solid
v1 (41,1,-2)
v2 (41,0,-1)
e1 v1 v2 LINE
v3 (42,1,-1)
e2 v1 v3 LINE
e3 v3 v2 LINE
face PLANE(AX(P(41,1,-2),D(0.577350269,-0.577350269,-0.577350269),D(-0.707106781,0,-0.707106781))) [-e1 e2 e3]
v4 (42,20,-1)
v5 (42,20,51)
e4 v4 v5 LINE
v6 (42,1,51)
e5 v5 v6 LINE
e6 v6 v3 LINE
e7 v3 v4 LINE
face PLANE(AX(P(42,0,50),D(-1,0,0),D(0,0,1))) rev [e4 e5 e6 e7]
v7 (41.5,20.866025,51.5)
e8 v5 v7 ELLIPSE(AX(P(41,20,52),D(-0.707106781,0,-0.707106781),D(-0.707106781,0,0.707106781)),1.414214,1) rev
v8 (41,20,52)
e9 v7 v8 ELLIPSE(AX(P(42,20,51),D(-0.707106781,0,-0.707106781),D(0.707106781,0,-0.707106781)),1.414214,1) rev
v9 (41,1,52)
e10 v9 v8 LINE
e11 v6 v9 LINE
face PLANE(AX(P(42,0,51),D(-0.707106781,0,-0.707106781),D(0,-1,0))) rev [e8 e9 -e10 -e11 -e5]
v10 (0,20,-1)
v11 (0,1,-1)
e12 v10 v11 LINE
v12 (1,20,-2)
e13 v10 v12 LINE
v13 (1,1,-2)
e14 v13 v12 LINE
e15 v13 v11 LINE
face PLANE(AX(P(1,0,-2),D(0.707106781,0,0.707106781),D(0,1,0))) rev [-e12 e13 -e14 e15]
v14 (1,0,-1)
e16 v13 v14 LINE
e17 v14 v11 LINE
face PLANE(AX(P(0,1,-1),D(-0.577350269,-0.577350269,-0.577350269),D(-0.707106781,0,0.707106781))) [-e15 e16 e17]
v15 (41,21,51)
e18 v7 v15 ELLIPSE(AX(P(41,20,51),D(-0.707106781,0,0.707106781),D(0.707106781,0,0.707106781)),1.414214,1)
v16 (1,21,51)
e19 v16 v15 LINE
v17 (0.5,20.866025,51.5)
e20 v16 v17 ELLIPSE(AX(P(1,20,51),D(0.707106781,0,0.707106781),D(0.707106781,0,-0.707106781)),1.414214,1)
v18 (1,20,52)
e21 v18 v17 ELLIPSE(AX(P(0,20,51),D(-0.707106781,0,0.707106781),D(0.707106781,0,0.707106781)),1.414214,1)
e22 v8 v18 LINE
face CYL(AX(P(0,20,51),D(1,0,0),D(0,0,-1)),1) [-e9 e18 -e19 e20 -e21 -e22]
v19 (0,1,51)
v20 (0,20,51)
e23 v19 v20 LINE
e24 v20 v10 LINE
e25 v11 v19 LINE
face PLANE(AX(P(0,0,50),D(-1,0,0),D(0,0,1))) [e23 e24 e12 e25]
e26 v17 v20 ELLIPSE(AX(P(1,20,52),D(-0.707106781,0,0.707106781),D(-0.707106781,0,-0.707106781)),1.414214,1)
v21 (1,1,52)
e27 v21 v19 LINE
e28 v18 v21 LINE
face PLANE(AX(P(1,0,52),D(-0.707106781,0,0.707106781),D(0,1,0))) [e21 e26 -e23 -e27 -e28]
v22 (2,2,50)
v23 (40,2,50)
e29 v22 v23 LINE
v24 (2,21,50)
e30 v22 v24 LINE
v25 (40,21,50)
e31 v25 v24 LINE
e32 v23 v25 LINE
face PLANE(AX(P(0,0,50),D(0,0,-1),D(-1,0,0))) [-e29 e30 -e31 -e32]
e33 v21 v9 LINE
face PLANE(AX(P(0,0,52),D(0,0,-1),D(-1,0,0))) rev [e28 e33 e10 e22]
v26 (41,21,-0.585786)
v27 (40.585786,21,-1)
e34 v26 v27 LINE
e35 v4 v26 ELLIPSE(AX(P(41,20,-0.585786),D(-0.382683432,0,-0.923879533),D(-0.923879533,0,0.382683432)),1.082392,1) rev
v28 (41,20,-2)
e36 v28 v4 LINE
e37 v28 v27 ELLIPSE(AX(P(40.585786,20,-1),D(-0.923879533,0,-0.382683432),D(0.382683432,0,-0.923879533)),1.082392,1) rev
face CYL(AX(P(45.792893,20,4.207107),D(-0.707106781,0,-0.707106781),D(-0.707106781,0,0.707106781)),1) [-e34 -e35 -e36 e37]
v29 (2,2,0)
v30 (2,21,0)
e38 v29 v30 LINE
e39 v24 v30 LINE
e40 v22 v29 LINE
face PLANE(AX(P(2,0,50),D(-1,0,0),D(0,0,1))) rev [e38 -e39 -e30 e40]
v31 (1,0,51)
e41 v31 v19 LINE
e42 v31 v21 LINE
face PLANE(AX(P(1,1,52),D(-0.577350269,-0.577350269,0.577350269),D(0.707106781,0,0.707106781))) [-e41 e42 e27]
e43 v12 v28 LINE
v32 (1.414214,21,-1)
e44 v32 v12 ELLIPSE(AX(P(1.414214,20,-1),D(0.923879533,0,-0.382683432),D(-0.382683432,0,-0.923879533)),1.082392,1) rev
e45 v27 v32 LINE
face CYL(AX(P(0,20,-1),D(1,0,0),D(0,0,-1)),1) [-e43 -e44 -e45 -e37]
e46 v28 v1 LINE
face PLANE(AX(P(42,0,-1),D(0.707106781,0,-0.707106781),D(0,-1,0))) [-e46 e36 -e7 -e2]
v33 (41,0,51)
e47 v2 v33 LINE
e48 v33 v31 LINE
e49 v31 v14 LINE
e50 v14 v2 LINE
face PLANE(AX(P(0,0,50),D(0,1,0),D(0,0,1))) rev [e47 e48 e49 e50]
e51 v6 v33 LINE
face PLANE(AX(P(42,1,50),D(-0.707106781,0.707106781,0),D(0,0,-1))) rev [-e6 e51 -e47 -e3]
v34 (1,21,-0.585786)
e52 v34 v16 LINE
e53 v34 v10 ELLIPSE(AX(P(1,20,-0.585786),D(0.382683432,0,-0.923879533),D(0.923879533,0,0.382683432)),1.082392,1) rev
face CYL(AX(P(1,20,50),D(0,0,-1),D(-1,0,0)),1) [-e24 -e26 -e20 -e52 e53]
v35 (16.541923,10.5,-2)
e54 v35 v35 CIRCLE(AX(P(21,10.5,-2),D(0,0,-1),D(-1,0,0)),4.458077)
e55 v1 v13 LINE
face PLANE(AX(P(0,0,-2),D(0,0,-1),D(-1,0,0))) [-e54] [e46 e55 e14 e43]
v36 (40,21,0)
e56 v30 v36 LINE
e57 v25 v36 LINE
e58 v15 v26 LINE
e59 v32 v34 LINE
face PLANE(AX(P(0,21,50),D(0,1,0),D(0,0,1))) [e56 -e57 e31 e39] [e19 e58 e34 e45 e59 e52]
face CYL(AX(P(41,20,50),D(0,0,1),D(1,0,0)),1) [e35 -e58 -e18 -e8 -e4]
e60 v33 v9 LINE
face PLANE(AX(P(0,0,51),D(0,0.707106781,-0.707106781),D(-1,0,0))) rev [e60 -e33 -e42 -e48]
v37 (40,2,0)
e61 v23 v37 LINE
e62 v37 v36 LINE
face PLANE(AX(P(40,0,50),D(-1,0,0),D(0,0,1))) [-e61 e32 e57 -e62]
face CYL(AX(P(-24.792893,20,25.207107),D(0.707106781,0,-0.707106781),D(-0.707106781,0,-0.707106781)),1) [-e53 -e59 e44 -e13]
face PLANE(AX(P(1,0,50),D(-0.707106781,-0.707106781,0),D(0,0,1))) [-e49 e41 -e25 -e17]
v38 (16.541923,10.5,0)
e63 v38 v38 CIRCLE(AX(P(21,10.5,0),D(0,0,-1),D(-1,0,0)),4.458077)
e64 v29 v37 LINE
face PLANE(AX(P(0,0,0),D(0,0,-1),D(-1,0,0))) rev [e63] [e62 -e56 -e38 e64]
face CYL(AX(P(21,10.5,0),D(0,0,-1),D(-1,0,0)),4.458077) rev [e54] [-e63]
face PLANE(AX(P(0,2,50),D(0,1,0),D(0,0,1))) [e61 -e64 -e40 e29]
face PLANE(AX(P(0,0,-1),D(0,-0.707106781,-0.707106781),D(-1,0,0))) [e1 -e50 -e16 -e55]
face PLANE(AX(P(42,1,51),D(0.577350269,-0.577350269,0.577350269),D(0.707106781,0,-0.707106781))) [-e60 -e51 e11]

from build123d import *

# Parameters (mm, degrees)
BOSS_EXTRUDE1_DEPTH = 50
SKETCH1_3_W         = 42
SKETCH1_3_H         = 21
BOSS_EXTRUDE2_DEPTH = 2
BOSS_EXTRUDE3_START = 50
SKETCH1_4_W         = 42
SKETCH1_4_H         = 21
BOSS_EXTRUDE3_DEPTH = 2
SKETCH2_R           = 4.458076667
CUT_EXTRUDE1_DEPTH  = 2
CHAMFER1_SIZE       = 1
FILLET1_R           = 1


with BuildPart() as part:
    # Sketch1 → Boss-Extrude1 (new body)
    with BuildSketch(Plane.XY):
        Polygon((40, 21), (40, 2), (2, 2), (2, 21), (0, 21), (0, 0), (42, 0), (42, 21), align=None)
    extrude(amount=BOSS_EXTRUDE1_DEPTH)

    # Sketch1<3> → Boss-Extrude2 (add)
    with BuildSketch(Plane.XY):
        with Locations((21, 10.5)):
            Rectangle(SKETCH1_3_W, SKETCH1_3_H)
    extrude(amount=-BOSS_EXTRUDE2_DEPTH)

    # Sketch1<4> → Boss-Extrude3 (add)
    with BuildSketch(Plane.XY.offset(BOSS_EXTRUDE3_START)):
        with Locations((21, 10.5)):
            Rectangle(SKETCH1_4_W, SKETCH1_4_H)
    extrude(amount=BOSS_EXTRUDE3_DEPTH)

    # Sketch2 → Cut-Extrude1 (cut)
    with BuildSketch(Plane(origin=(0, 0, -2), x_dir=(-1, 0, 0), z_dir=(0, 0, -1))):
        with Locations((-21, 10.5)):
            Circle(SKETCH2_R)
    extrude(amount=-CUT_EXTRUDE1_DEPTH, mode=Mode.SUBTRACT)

    # Chamfer1
    chamfer1_edges = [part.edges().sort_by_distance(p)[0] for p in [
        (42, 0, 25),
        (0, 0, 25),
        (42, 10.5, -2),
        (21, 0, -2),
        (0, 10.5, -2),
        (42, 10.5, 52),
        (21, 0, 52),
        (0, 10.5, 52),
    ]]
    chamfer(chamfer1_edges, length=CHAMFER1_SIZE)

    # Fillet1
    # the kernel refuses this fillet: 1 mm, written as the material it takes off along each edge
    with BuildSketch(Plane(origin=(43.5, 21, 52), x_dir=(0, 0, -1), z_dir=(-1, 0, 0))) as fillet1_piece_1:
        with BuildLine():
            CenterArc((FILLET1_R, FILLET1_R), FILLET1_R, 180, 90)
            Line((0, FILLET1_R), (0, 0))
            Line((0, 0), (FILLET1_R, 0))
        make_face()
    extrude(amount=45, mode=Mode.SUBTRACT)
    with BuildSketch(Plane(origin=(0, 21, -3.5), x_dir=(1, 0, 0), z_dir=(0, 0, 1)), Plane(origin=(42, 21, 53.5), x_dir=(-1, 0, 0), z_dir=(0, 0, -1))) as fillet1_piece_2:
        with BuildLine():
            CenterArc((FILLET1_R, -FILLET1_R), FILLET1_R, 90, 90)
            Line((0, -FILLET1_R), (0, 0))
            Line((0, 0), (FILLET1_R, 0))
        make_face()
    extrude(amount=57, mode=Mode.SUBTRACT)
    with BuildSketch(Plane(origin=(43.5, 21, -2), x_dir=(0, 0, 1), z_dir=(-1, 0, 0))) as fillet1_piece_3:
        with BuildLine():
            CenterArc((FILLET1_R, -FILLET1_R), FILLET1_R, 90, 90)
            Line((0, -FILLET1_R), (0, 0))
            Line((0, 0), (FILLET1_R, 0))
        make_face()
    extrude(amount=45, mode=Mode.SUBTRACT)
    with BuildSketch(Plane(origin=(-1.767766953, 21, 0.767766953), x_dir=(0.7071067811865476, 0, 0.7071067811865476), z_dir=(0.7071067811865476, 0, -0.7071067811865476))) as fillet1_piece_4:
        with BuildLine():
            CenterArc((FILLET1_R, FILLET1_R), FILLET1_R, 180, 90)
            Line((0, FILLET1_R), (0, 0))
            Line((0, 0), (FILLET1_R, 0))
        make_face()
    extrude(amount=6.414213562, mode=Mode.SUBTRACT)
    with BuildSketch(Plane(origin=(43.767766953, 21, 0.767766953), x_dir=(-0.7071067811865475, 0, 0.7071067811865476), z_dir=(-0.7071067811865476, 0, -0.7071067811865476))) as fillet1_piece_5:
        with BuildLine():
            CenterArc((FILLET1_R, -FILLET1_R), FILLET1_R, 90, 90)
            Line((0, -FILLET1_R), (0, 0))
            Line((0, 0), (FILLET1_R, 0))
        make_face()
    extrude(amount=6.414213562, mode=Mode.SUBTRACT)


solid = part.part
